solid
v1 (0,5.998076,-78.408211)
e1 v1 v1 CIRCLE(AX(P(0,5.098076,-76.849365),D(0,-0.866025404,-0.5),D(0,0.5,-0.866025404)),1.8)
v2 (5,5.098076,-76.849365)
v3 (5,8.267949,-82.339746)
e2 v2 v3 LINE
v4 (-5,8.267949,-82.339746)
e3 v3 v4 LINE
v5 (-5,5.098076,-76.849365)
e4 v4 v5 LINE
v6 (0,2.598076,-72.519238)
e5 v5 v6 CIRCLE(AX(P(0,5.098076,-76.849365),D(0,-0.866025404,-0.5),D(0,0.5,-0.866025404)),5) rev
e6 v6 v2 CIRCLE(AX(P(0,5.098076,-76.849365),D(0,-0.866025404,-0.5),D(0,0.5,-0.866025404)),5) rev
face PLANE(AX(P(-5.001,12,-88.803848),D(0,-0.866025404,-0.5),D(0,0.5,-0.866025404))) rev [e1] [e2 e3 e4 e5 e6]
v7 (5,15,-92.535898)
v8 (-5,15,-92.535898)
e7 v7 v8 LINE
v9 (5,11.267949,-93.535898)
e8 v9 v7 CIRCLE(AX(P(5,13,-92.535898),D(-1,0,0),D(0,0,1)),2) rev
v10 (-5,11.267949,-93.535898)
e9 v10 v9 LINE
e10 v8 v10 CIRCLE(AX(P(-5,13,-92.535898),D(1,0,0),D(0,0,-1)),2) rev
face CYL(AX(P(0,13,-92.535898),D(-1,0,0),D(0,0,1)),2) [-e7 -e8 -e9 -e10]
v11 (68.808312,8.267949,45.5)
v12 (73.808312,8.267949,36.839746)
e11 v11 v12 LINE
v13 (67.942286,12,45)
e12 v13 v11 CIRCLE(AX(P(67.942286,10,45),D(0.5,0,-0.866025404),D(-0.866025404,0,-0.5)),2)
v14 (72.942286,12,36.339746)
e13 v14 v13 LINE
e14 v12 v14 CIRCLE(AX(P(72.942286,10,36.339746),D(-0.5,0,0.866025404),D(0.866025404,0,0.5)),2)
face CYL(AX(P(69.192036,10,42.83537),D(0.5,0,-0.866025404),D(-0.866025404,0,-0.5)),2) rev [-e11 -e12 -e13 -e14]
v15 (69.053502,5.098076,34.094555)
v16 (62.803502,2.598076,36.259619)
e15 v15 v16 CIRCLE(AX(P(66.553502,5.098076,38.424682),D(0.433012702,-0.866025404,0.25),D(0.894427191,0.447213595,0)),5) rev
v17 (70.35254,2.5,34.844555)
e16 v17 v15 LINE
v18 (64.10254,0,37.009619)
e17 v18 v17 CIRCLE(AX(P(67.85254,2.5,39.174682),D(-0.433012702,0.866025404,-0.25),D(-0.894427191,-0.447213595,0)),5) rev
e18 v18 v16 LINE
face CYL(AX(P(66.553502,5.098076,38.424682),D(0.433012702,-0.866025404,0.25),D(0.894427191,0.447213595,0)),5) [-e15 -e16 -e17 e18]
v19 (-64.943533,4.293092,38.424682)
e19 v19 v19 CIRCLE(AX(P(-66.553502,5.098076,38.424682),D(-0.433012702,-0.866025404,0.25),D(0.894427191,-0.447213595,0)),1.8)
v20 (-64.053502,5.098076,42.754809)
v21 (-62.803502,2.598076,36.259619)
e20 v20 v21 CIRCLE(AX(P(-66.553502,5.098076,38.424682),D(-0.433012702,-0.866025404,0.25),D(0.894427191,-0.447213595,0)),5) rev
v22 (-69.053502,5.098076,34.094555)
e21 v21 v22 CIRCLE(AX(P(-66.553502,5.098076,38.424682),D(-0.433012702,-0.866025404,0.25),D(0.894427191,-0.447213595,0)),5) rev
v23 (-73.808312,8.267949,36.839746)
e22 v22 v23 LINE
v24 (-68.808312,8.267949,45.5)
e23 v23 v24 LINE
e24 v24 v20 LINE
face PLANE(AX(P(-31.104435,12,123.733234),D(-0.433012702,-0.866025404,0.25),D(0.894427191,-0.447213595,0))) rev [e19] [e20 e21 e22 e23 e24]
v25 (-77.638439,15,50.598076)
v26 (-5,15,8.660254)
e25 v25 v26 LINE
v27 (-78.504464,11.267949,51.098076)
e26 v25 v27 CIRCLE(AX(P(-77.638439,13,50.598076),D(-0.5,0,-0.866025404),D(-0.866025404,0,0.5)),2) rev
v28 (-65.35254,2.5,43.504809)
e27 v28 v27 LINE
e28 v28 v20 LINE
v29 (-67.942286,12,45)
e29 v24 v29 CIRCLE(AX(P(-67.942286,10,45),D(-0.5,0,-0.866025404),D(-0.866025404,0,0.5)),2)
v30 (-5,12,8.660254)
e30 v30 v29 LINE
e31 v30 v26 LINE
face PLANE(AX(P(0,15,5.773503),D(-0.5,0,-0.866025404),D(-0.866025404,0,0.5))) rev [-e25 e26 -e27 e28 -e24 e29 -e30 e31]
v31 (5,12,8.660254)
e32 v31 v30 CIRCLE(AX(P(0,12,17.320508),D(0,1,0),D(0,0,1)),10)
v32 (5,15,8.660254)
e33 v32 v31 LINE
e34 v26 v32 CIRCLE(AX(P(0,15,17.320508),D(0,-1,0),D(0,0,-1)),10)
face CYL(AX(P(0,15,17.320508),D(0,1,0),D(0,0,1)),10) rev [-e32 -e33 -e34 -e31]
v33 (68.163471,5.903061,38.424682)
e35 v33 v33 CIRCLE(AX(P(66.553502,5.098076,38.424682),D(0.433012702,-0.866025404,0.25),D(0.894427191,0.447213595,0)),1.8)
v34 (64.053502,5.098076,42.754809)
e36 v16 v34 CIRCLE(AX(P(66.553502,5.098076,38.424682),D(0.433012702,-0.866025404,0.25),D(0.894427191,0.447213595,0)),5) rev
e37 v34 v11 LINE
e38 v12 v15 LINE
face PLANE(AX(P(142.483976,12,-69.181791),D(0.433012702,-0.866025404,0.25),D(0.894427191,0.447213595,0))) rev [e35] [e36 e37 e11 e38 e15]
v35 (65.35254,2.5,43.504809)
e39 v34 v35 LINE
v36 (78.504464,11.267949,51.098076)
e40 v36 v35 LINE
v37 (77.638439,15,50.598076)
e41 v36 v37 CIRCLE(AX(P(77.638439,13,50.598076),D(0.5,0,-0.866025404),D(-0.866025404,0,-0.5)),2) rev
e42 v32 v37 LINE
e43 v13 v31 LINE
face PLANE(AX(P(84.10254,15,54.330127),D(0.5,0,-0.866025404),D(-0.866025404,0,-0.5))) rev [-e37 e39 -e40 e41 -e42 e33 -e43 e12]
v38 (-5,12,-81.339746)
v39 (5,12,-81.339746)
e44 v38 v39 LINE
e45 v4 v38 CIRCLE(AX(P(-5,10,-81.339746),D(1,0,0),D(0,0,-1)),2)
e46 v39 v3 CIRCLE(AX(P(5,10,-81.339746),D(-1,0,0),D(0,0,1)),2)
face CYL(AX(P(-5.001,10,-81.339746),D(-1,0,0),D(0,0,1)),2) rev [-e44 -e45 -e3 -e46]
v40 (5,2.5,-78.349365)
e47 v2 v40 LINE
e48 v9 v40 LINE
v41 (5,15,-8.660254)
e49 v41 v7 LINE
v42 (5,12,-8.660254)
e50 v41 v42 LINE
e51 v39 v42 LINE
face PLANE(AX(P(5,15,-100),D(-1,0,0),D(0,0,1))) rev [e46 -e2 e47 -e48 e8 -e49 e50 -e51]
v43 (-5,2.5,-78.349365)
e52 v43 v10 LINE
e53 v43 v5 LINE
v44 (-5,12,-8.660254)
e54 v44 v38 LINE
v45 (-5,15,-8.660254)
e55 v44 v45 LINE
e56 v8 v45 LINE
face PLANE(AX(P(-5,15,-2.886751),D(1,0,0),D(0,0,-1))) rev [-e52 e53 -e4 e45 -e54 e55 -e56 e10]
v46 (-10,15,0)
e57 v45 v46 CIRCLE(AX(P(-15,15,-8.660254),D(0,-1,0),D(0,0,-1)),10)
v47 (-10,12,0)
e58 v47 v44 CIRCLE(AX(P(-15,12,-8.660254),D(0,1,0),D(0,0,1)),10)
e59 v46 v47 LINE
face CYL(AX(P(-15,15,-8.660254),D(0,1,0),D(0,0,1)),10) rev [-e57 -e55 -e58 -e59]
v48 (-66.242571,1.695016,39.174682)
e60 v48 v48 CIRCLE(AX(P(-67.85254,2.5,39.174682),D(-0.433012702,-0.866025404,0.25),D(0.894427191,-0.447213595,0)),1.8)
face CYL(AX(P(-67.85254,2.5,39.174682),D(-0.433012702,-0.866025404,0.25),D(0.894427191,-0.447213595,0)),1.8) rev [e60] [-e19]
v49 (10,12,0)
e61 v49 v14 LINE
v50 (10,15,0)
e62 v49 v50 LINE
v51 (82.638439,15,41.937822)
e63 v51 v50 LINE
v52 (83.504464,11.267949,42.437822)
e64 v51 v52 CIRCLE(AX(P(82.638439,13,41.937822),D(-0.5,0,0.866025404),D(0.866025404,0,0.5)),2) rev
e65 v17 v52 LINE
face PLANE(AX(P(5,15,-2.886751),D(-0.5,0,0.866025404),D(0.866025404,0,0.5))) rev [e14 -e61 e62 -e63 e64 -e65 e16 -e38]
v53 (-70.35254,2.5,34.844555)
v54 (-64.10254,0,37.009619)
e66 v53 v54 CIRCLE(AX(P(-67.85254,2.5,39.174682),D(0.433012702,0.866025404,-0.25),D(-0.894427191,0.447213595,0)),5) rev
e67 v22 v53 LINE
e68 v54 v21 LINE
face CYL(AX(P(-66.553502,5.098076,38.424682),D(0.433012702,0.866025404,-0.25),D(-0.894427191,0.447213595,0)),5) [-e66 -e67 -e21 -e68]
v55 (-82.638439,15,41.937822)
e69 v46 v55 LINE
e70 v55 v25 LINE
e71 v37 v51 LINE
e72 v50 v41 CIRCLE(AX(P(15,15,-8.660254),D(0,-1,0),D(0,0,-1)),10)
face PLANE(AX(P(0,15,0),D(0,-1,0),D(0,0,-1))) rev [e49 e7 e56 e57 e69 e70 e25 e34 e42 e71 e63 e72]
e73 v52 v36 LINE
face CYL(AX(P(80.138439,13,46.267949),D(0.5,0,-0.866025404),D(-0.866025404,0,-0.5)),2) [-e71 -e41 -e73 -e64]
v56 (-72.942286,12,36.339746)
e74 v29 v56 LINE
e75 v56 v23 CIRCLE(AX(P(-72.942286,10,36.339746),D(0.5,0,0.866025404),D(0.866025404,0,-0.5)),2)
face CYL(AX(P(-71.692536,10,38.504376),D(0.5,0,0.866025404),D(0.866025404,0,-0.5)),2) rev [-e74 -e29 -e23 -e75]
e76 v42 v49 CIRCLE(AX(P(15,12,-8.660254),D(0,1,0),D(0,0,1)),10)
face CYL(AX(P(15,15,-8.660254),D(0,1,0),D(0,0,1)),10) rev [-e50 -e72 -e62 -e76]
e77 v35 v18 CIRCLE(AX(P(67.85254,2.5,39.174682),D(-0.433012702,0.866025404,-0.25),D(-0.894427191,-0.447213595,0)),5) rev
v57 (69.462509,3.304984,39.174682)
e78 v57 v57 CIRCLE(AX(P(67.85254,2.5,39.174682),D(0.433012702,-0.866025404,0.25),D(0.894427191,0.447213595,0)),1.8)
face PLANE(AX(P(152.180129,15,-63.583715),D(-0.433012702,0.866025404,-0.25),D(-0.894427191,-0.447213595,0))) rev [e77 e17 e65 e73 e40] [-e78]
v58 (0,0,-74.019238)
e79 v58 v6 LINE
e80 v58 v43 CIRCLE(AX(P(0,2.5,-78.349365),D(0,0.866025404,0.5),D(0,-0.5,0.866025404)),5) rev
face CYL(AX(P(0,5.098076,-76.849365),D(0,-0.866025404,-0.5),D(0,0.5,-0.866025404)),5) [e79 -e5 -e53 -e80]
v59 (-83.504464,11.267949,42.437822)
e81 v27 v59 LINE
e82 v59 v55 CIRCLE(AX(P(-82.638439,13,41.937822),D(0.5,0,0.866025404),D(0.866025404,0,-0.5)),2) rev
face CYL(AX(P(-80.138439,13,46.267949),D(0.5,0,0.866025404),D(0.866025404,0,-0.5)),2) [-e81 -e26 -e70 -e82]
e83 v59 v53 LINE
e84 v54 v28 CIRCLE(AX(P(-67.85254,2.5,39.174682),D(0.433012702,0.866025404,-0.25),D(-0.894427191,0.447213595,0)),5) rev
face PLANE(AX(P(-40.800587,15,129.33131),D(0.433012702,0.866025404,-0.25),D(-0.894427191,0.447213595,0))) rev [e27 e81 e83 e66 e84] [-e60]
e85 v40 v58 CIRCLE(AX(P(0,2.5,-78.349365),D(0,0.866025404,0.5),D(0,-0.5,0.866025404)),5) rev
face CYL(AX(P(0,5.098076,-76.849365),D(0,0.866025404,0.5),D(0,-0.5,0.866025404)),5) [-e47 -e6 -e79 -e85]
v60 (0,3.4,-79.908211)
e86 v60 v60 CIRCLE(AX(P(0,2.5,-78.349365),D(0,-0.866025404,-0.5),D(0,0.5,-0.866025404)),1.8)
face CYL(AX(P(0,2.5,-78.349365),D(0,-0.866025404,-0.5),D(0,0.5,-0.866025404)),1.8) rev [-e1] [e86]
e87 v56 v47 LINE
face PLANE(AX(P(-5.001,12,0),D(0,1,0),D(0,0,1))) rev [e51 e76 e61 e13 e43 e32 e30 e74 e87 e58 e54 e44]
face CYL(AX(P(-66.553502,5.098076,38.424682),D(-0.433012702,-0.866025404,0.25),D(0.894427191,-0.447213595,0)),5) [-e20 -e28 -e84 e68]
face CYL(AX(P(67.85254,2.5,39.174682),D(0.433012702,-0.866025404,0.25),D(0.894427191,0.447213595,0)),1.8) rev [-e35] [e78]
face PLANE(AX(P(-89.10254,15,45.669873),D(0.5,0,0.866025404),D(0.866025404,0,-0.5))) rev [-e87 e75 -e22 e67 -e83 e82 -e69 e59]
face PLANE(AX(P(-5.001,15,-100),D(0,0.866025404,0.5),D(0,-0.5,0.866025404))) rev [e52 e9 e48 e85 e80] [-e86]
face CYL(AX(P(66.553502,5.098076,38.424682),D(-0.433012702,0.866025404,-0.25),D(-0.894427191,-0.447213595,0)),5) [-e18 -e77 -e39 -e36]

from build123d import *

# Parameters (mm, degrees)
BOSS_EXTRUDE1_DEPTH      = 15
CUT_EXTRUDE1_REACH       = 103.612
M3_CLEARANCE_HOLE1_D     = 3.6
M3_CLEARANCE_HOLE1_DEPTH = 3
CUT_EXTRUDE2_REACH       = 103.612
CIRPATTERN1_COUNT        = 3
FILLET1_R                = 2
FILLET2_R                = 10
FILLET3_R                = 5


with BuildPart() as part:
    # Sketch2 → Boss-Extrude1 (new body)
    with BuildSketch(Plane(origin=(0, 0, 0), x_dir=(1, 0, 0), z_dir=(0, 1, 0))):
        Polygon((0, 0), (-5, 2.886751346), (-5, 100), (5, 100), (5, 2.886751346), align=None)
    boss_extrude1 = extrude(amount=BOSS_EXTRUDE1_DEPTH)

    # Sketch3 → Cut-Extrude1 (cut, up to next)
    with BuildSketch(Plane(origin=(5, 0, 0), x_dir=(0, 0, -1), z_dir=(1, 0, 0)), mode=Mode.PRIVATE) as cut_extrude1_sk1:
        Polygon((0, 12), (88.803847577, 12), (68.019237886, 0), (0, 0), align=None)
    cut_extrude1_tool1 = extrude(cut_extrude1_sk1.sketch, amount=-CUT_EXTRUDE1_REACH, mode=Mode.PRIVATE) & part.part
    # Sketch3 → Cut-Extrude1 (cut, up to next)
    with BuildSketch(Plane(origin=(5, 0, 0), x_dir=(0, 0, -1), z_dir=(1, 0, 0)), mode=Mode.PRIVATE) as cut_extrude1_sk2:
        Polygon((100, 15), (74.019237886, 0), (100, 0), align=None)
    cut_extrude1_tool2 = extrude(cut_extrude1_sk2.sketch, amount=-CUT_EXTRUDE1_REACH, mode=Mode.PRIVATE) & part.part
    cut_extrude1_1 = cut_extrude1_tool1.solids().sort_by_distance((5, 6.265071, -39.435329))[0]
    add(cut_extrude1_1, mode=Mode.SUBTRACT)
    cut_extrude1_2 = cut_extrude1_tool2.solids().sort_by_distance((5, 5, -91.339746))[0]
    add(cut_extrude1_2, mode=Mode.SUBTRACT)
    cut_extrude1 = cut_extrude1_1 + cut_extrude1_2  # Cut-Extrude1 as one shape, for the pattern or mirror that repeats it

    # M3 Clearance Hole1
    with Locations(Plane(origin=(0, -32.051270189, -18.504809472), x_dir=(1, 0, 0), z_dir=(0, -0.8660254037844417, -0.49999999999999484))):
        with Locations((0, -69.102540378)):
            m3_clearance_hole1 = Hole(M3_CLEARANCE_HOLE1_D / 2, depth=M3_CLEARANCE_HOLE1_DEPTH)

    # Sketch6 → Cut-Extrude2 (cut, up to next)
    with BuildSketch(Plane(origin=(5, 0, 0), x_dir=(0, 0, -1), z_dir=(1, 0, 0)), mode=Mode.PRIVATE) as cut_extrude2_sk1:
        Polygon((74.019237886, 0), (68.019237886, 0), (72.519237886, 2.598076211), align=None)
    cut_extrude2_tool1 = extrude(cut_extrude2_sk1.sketch, amount=-CUT_EXTRUDE2_REACH, mode=Mode.PRIVATE) & part.part
    cut_extrude2 = cut_extrude2_tool1.solids().sort_by_distance((5, 0.866025, -71.519238))[0]
    add(cut_extrude2, mode=Mode.SUBTRACT)

    # CirPattern1: Boss-Extrude1, Cut-Extrude1, M3 Clearance Hole1, Cut-Extrude2 ×3 about axis
    cirpattern1_axis = Axis((0, 0, 0), (0, 1, 0))
    add([boss_extrude1.rotate(cirpattern1_axis, i * 360 / CIRPATTERN1_COUNT) for i in range(1, CIRPATTERN1_COUNT)])
    add([cut_extrude1.rotate(cirpattern1_axis, i * 360 / CIRPATTERN1_COUNT) for i in range(1, CIRPATTERN1_COUNT)], mode=Mode.SUBTRACT)
    add([m3_clearance_hole1.rotate(cirpattern1_axis, i * 360 / CIRPATTERN1_COUNT) for i in range(1, CIRPATTERN1_COUNT)], mode=Mode.SUBTRACT)
    add([cut_extrude2.rotate(cirpattern1_axis, i * 360 / CIRPATTERN1_COUNT) for i in range(1, CIRPATTERN1_COUNT)], mode=Mode.SUBTRACT)

    # Fillet1
    fillet1_edges = [part.edges().sort_by_distance(p)[0] for p in [
        (76.906387956, 12, 44.401923789),
        (-76.906387956, 12, 44.401923789),
        (0, 15, -100),
        (0, 12, -88.803847577),
        (-86.602540378, 15, 50),
        (86.602540378, 15, 50),
    ]]
    fillet(fillet1_edges, radius=FILLET1_R)

    # Fillet2
    fillet2_edges = [part.edges().sort_by_distance(p)[0] for p in [
        (0, 13.5, 5.773502692),
        (-5, 13.5, -2.886751346),
        (5, 13.5, -2.886751346),
    ]]
    fillet(fillet2_edges, radius=FILLET2_R)

    # Fillet3
    fillet3_edges = [part.edges().sort_by_distance(p)[0] for p in [
        (65.953021326, 1.299038106, 32.304491924),
        (60.953021326, 1.299038106, 40.964745962),
        (-60.953021326, 1.299038106, 40.964745962),
        (-65.953021326, 1.299038106, 32.304491924),
        (-5, 1.299038106, -73.269237886),
        (5, 1.299038106, -73.269237886),
    ]]
    fillet(fillet3_edges, radius=FILLET3_R - 0.0001)  # a hair under: the kernel refuses the full size


solid = part.part
